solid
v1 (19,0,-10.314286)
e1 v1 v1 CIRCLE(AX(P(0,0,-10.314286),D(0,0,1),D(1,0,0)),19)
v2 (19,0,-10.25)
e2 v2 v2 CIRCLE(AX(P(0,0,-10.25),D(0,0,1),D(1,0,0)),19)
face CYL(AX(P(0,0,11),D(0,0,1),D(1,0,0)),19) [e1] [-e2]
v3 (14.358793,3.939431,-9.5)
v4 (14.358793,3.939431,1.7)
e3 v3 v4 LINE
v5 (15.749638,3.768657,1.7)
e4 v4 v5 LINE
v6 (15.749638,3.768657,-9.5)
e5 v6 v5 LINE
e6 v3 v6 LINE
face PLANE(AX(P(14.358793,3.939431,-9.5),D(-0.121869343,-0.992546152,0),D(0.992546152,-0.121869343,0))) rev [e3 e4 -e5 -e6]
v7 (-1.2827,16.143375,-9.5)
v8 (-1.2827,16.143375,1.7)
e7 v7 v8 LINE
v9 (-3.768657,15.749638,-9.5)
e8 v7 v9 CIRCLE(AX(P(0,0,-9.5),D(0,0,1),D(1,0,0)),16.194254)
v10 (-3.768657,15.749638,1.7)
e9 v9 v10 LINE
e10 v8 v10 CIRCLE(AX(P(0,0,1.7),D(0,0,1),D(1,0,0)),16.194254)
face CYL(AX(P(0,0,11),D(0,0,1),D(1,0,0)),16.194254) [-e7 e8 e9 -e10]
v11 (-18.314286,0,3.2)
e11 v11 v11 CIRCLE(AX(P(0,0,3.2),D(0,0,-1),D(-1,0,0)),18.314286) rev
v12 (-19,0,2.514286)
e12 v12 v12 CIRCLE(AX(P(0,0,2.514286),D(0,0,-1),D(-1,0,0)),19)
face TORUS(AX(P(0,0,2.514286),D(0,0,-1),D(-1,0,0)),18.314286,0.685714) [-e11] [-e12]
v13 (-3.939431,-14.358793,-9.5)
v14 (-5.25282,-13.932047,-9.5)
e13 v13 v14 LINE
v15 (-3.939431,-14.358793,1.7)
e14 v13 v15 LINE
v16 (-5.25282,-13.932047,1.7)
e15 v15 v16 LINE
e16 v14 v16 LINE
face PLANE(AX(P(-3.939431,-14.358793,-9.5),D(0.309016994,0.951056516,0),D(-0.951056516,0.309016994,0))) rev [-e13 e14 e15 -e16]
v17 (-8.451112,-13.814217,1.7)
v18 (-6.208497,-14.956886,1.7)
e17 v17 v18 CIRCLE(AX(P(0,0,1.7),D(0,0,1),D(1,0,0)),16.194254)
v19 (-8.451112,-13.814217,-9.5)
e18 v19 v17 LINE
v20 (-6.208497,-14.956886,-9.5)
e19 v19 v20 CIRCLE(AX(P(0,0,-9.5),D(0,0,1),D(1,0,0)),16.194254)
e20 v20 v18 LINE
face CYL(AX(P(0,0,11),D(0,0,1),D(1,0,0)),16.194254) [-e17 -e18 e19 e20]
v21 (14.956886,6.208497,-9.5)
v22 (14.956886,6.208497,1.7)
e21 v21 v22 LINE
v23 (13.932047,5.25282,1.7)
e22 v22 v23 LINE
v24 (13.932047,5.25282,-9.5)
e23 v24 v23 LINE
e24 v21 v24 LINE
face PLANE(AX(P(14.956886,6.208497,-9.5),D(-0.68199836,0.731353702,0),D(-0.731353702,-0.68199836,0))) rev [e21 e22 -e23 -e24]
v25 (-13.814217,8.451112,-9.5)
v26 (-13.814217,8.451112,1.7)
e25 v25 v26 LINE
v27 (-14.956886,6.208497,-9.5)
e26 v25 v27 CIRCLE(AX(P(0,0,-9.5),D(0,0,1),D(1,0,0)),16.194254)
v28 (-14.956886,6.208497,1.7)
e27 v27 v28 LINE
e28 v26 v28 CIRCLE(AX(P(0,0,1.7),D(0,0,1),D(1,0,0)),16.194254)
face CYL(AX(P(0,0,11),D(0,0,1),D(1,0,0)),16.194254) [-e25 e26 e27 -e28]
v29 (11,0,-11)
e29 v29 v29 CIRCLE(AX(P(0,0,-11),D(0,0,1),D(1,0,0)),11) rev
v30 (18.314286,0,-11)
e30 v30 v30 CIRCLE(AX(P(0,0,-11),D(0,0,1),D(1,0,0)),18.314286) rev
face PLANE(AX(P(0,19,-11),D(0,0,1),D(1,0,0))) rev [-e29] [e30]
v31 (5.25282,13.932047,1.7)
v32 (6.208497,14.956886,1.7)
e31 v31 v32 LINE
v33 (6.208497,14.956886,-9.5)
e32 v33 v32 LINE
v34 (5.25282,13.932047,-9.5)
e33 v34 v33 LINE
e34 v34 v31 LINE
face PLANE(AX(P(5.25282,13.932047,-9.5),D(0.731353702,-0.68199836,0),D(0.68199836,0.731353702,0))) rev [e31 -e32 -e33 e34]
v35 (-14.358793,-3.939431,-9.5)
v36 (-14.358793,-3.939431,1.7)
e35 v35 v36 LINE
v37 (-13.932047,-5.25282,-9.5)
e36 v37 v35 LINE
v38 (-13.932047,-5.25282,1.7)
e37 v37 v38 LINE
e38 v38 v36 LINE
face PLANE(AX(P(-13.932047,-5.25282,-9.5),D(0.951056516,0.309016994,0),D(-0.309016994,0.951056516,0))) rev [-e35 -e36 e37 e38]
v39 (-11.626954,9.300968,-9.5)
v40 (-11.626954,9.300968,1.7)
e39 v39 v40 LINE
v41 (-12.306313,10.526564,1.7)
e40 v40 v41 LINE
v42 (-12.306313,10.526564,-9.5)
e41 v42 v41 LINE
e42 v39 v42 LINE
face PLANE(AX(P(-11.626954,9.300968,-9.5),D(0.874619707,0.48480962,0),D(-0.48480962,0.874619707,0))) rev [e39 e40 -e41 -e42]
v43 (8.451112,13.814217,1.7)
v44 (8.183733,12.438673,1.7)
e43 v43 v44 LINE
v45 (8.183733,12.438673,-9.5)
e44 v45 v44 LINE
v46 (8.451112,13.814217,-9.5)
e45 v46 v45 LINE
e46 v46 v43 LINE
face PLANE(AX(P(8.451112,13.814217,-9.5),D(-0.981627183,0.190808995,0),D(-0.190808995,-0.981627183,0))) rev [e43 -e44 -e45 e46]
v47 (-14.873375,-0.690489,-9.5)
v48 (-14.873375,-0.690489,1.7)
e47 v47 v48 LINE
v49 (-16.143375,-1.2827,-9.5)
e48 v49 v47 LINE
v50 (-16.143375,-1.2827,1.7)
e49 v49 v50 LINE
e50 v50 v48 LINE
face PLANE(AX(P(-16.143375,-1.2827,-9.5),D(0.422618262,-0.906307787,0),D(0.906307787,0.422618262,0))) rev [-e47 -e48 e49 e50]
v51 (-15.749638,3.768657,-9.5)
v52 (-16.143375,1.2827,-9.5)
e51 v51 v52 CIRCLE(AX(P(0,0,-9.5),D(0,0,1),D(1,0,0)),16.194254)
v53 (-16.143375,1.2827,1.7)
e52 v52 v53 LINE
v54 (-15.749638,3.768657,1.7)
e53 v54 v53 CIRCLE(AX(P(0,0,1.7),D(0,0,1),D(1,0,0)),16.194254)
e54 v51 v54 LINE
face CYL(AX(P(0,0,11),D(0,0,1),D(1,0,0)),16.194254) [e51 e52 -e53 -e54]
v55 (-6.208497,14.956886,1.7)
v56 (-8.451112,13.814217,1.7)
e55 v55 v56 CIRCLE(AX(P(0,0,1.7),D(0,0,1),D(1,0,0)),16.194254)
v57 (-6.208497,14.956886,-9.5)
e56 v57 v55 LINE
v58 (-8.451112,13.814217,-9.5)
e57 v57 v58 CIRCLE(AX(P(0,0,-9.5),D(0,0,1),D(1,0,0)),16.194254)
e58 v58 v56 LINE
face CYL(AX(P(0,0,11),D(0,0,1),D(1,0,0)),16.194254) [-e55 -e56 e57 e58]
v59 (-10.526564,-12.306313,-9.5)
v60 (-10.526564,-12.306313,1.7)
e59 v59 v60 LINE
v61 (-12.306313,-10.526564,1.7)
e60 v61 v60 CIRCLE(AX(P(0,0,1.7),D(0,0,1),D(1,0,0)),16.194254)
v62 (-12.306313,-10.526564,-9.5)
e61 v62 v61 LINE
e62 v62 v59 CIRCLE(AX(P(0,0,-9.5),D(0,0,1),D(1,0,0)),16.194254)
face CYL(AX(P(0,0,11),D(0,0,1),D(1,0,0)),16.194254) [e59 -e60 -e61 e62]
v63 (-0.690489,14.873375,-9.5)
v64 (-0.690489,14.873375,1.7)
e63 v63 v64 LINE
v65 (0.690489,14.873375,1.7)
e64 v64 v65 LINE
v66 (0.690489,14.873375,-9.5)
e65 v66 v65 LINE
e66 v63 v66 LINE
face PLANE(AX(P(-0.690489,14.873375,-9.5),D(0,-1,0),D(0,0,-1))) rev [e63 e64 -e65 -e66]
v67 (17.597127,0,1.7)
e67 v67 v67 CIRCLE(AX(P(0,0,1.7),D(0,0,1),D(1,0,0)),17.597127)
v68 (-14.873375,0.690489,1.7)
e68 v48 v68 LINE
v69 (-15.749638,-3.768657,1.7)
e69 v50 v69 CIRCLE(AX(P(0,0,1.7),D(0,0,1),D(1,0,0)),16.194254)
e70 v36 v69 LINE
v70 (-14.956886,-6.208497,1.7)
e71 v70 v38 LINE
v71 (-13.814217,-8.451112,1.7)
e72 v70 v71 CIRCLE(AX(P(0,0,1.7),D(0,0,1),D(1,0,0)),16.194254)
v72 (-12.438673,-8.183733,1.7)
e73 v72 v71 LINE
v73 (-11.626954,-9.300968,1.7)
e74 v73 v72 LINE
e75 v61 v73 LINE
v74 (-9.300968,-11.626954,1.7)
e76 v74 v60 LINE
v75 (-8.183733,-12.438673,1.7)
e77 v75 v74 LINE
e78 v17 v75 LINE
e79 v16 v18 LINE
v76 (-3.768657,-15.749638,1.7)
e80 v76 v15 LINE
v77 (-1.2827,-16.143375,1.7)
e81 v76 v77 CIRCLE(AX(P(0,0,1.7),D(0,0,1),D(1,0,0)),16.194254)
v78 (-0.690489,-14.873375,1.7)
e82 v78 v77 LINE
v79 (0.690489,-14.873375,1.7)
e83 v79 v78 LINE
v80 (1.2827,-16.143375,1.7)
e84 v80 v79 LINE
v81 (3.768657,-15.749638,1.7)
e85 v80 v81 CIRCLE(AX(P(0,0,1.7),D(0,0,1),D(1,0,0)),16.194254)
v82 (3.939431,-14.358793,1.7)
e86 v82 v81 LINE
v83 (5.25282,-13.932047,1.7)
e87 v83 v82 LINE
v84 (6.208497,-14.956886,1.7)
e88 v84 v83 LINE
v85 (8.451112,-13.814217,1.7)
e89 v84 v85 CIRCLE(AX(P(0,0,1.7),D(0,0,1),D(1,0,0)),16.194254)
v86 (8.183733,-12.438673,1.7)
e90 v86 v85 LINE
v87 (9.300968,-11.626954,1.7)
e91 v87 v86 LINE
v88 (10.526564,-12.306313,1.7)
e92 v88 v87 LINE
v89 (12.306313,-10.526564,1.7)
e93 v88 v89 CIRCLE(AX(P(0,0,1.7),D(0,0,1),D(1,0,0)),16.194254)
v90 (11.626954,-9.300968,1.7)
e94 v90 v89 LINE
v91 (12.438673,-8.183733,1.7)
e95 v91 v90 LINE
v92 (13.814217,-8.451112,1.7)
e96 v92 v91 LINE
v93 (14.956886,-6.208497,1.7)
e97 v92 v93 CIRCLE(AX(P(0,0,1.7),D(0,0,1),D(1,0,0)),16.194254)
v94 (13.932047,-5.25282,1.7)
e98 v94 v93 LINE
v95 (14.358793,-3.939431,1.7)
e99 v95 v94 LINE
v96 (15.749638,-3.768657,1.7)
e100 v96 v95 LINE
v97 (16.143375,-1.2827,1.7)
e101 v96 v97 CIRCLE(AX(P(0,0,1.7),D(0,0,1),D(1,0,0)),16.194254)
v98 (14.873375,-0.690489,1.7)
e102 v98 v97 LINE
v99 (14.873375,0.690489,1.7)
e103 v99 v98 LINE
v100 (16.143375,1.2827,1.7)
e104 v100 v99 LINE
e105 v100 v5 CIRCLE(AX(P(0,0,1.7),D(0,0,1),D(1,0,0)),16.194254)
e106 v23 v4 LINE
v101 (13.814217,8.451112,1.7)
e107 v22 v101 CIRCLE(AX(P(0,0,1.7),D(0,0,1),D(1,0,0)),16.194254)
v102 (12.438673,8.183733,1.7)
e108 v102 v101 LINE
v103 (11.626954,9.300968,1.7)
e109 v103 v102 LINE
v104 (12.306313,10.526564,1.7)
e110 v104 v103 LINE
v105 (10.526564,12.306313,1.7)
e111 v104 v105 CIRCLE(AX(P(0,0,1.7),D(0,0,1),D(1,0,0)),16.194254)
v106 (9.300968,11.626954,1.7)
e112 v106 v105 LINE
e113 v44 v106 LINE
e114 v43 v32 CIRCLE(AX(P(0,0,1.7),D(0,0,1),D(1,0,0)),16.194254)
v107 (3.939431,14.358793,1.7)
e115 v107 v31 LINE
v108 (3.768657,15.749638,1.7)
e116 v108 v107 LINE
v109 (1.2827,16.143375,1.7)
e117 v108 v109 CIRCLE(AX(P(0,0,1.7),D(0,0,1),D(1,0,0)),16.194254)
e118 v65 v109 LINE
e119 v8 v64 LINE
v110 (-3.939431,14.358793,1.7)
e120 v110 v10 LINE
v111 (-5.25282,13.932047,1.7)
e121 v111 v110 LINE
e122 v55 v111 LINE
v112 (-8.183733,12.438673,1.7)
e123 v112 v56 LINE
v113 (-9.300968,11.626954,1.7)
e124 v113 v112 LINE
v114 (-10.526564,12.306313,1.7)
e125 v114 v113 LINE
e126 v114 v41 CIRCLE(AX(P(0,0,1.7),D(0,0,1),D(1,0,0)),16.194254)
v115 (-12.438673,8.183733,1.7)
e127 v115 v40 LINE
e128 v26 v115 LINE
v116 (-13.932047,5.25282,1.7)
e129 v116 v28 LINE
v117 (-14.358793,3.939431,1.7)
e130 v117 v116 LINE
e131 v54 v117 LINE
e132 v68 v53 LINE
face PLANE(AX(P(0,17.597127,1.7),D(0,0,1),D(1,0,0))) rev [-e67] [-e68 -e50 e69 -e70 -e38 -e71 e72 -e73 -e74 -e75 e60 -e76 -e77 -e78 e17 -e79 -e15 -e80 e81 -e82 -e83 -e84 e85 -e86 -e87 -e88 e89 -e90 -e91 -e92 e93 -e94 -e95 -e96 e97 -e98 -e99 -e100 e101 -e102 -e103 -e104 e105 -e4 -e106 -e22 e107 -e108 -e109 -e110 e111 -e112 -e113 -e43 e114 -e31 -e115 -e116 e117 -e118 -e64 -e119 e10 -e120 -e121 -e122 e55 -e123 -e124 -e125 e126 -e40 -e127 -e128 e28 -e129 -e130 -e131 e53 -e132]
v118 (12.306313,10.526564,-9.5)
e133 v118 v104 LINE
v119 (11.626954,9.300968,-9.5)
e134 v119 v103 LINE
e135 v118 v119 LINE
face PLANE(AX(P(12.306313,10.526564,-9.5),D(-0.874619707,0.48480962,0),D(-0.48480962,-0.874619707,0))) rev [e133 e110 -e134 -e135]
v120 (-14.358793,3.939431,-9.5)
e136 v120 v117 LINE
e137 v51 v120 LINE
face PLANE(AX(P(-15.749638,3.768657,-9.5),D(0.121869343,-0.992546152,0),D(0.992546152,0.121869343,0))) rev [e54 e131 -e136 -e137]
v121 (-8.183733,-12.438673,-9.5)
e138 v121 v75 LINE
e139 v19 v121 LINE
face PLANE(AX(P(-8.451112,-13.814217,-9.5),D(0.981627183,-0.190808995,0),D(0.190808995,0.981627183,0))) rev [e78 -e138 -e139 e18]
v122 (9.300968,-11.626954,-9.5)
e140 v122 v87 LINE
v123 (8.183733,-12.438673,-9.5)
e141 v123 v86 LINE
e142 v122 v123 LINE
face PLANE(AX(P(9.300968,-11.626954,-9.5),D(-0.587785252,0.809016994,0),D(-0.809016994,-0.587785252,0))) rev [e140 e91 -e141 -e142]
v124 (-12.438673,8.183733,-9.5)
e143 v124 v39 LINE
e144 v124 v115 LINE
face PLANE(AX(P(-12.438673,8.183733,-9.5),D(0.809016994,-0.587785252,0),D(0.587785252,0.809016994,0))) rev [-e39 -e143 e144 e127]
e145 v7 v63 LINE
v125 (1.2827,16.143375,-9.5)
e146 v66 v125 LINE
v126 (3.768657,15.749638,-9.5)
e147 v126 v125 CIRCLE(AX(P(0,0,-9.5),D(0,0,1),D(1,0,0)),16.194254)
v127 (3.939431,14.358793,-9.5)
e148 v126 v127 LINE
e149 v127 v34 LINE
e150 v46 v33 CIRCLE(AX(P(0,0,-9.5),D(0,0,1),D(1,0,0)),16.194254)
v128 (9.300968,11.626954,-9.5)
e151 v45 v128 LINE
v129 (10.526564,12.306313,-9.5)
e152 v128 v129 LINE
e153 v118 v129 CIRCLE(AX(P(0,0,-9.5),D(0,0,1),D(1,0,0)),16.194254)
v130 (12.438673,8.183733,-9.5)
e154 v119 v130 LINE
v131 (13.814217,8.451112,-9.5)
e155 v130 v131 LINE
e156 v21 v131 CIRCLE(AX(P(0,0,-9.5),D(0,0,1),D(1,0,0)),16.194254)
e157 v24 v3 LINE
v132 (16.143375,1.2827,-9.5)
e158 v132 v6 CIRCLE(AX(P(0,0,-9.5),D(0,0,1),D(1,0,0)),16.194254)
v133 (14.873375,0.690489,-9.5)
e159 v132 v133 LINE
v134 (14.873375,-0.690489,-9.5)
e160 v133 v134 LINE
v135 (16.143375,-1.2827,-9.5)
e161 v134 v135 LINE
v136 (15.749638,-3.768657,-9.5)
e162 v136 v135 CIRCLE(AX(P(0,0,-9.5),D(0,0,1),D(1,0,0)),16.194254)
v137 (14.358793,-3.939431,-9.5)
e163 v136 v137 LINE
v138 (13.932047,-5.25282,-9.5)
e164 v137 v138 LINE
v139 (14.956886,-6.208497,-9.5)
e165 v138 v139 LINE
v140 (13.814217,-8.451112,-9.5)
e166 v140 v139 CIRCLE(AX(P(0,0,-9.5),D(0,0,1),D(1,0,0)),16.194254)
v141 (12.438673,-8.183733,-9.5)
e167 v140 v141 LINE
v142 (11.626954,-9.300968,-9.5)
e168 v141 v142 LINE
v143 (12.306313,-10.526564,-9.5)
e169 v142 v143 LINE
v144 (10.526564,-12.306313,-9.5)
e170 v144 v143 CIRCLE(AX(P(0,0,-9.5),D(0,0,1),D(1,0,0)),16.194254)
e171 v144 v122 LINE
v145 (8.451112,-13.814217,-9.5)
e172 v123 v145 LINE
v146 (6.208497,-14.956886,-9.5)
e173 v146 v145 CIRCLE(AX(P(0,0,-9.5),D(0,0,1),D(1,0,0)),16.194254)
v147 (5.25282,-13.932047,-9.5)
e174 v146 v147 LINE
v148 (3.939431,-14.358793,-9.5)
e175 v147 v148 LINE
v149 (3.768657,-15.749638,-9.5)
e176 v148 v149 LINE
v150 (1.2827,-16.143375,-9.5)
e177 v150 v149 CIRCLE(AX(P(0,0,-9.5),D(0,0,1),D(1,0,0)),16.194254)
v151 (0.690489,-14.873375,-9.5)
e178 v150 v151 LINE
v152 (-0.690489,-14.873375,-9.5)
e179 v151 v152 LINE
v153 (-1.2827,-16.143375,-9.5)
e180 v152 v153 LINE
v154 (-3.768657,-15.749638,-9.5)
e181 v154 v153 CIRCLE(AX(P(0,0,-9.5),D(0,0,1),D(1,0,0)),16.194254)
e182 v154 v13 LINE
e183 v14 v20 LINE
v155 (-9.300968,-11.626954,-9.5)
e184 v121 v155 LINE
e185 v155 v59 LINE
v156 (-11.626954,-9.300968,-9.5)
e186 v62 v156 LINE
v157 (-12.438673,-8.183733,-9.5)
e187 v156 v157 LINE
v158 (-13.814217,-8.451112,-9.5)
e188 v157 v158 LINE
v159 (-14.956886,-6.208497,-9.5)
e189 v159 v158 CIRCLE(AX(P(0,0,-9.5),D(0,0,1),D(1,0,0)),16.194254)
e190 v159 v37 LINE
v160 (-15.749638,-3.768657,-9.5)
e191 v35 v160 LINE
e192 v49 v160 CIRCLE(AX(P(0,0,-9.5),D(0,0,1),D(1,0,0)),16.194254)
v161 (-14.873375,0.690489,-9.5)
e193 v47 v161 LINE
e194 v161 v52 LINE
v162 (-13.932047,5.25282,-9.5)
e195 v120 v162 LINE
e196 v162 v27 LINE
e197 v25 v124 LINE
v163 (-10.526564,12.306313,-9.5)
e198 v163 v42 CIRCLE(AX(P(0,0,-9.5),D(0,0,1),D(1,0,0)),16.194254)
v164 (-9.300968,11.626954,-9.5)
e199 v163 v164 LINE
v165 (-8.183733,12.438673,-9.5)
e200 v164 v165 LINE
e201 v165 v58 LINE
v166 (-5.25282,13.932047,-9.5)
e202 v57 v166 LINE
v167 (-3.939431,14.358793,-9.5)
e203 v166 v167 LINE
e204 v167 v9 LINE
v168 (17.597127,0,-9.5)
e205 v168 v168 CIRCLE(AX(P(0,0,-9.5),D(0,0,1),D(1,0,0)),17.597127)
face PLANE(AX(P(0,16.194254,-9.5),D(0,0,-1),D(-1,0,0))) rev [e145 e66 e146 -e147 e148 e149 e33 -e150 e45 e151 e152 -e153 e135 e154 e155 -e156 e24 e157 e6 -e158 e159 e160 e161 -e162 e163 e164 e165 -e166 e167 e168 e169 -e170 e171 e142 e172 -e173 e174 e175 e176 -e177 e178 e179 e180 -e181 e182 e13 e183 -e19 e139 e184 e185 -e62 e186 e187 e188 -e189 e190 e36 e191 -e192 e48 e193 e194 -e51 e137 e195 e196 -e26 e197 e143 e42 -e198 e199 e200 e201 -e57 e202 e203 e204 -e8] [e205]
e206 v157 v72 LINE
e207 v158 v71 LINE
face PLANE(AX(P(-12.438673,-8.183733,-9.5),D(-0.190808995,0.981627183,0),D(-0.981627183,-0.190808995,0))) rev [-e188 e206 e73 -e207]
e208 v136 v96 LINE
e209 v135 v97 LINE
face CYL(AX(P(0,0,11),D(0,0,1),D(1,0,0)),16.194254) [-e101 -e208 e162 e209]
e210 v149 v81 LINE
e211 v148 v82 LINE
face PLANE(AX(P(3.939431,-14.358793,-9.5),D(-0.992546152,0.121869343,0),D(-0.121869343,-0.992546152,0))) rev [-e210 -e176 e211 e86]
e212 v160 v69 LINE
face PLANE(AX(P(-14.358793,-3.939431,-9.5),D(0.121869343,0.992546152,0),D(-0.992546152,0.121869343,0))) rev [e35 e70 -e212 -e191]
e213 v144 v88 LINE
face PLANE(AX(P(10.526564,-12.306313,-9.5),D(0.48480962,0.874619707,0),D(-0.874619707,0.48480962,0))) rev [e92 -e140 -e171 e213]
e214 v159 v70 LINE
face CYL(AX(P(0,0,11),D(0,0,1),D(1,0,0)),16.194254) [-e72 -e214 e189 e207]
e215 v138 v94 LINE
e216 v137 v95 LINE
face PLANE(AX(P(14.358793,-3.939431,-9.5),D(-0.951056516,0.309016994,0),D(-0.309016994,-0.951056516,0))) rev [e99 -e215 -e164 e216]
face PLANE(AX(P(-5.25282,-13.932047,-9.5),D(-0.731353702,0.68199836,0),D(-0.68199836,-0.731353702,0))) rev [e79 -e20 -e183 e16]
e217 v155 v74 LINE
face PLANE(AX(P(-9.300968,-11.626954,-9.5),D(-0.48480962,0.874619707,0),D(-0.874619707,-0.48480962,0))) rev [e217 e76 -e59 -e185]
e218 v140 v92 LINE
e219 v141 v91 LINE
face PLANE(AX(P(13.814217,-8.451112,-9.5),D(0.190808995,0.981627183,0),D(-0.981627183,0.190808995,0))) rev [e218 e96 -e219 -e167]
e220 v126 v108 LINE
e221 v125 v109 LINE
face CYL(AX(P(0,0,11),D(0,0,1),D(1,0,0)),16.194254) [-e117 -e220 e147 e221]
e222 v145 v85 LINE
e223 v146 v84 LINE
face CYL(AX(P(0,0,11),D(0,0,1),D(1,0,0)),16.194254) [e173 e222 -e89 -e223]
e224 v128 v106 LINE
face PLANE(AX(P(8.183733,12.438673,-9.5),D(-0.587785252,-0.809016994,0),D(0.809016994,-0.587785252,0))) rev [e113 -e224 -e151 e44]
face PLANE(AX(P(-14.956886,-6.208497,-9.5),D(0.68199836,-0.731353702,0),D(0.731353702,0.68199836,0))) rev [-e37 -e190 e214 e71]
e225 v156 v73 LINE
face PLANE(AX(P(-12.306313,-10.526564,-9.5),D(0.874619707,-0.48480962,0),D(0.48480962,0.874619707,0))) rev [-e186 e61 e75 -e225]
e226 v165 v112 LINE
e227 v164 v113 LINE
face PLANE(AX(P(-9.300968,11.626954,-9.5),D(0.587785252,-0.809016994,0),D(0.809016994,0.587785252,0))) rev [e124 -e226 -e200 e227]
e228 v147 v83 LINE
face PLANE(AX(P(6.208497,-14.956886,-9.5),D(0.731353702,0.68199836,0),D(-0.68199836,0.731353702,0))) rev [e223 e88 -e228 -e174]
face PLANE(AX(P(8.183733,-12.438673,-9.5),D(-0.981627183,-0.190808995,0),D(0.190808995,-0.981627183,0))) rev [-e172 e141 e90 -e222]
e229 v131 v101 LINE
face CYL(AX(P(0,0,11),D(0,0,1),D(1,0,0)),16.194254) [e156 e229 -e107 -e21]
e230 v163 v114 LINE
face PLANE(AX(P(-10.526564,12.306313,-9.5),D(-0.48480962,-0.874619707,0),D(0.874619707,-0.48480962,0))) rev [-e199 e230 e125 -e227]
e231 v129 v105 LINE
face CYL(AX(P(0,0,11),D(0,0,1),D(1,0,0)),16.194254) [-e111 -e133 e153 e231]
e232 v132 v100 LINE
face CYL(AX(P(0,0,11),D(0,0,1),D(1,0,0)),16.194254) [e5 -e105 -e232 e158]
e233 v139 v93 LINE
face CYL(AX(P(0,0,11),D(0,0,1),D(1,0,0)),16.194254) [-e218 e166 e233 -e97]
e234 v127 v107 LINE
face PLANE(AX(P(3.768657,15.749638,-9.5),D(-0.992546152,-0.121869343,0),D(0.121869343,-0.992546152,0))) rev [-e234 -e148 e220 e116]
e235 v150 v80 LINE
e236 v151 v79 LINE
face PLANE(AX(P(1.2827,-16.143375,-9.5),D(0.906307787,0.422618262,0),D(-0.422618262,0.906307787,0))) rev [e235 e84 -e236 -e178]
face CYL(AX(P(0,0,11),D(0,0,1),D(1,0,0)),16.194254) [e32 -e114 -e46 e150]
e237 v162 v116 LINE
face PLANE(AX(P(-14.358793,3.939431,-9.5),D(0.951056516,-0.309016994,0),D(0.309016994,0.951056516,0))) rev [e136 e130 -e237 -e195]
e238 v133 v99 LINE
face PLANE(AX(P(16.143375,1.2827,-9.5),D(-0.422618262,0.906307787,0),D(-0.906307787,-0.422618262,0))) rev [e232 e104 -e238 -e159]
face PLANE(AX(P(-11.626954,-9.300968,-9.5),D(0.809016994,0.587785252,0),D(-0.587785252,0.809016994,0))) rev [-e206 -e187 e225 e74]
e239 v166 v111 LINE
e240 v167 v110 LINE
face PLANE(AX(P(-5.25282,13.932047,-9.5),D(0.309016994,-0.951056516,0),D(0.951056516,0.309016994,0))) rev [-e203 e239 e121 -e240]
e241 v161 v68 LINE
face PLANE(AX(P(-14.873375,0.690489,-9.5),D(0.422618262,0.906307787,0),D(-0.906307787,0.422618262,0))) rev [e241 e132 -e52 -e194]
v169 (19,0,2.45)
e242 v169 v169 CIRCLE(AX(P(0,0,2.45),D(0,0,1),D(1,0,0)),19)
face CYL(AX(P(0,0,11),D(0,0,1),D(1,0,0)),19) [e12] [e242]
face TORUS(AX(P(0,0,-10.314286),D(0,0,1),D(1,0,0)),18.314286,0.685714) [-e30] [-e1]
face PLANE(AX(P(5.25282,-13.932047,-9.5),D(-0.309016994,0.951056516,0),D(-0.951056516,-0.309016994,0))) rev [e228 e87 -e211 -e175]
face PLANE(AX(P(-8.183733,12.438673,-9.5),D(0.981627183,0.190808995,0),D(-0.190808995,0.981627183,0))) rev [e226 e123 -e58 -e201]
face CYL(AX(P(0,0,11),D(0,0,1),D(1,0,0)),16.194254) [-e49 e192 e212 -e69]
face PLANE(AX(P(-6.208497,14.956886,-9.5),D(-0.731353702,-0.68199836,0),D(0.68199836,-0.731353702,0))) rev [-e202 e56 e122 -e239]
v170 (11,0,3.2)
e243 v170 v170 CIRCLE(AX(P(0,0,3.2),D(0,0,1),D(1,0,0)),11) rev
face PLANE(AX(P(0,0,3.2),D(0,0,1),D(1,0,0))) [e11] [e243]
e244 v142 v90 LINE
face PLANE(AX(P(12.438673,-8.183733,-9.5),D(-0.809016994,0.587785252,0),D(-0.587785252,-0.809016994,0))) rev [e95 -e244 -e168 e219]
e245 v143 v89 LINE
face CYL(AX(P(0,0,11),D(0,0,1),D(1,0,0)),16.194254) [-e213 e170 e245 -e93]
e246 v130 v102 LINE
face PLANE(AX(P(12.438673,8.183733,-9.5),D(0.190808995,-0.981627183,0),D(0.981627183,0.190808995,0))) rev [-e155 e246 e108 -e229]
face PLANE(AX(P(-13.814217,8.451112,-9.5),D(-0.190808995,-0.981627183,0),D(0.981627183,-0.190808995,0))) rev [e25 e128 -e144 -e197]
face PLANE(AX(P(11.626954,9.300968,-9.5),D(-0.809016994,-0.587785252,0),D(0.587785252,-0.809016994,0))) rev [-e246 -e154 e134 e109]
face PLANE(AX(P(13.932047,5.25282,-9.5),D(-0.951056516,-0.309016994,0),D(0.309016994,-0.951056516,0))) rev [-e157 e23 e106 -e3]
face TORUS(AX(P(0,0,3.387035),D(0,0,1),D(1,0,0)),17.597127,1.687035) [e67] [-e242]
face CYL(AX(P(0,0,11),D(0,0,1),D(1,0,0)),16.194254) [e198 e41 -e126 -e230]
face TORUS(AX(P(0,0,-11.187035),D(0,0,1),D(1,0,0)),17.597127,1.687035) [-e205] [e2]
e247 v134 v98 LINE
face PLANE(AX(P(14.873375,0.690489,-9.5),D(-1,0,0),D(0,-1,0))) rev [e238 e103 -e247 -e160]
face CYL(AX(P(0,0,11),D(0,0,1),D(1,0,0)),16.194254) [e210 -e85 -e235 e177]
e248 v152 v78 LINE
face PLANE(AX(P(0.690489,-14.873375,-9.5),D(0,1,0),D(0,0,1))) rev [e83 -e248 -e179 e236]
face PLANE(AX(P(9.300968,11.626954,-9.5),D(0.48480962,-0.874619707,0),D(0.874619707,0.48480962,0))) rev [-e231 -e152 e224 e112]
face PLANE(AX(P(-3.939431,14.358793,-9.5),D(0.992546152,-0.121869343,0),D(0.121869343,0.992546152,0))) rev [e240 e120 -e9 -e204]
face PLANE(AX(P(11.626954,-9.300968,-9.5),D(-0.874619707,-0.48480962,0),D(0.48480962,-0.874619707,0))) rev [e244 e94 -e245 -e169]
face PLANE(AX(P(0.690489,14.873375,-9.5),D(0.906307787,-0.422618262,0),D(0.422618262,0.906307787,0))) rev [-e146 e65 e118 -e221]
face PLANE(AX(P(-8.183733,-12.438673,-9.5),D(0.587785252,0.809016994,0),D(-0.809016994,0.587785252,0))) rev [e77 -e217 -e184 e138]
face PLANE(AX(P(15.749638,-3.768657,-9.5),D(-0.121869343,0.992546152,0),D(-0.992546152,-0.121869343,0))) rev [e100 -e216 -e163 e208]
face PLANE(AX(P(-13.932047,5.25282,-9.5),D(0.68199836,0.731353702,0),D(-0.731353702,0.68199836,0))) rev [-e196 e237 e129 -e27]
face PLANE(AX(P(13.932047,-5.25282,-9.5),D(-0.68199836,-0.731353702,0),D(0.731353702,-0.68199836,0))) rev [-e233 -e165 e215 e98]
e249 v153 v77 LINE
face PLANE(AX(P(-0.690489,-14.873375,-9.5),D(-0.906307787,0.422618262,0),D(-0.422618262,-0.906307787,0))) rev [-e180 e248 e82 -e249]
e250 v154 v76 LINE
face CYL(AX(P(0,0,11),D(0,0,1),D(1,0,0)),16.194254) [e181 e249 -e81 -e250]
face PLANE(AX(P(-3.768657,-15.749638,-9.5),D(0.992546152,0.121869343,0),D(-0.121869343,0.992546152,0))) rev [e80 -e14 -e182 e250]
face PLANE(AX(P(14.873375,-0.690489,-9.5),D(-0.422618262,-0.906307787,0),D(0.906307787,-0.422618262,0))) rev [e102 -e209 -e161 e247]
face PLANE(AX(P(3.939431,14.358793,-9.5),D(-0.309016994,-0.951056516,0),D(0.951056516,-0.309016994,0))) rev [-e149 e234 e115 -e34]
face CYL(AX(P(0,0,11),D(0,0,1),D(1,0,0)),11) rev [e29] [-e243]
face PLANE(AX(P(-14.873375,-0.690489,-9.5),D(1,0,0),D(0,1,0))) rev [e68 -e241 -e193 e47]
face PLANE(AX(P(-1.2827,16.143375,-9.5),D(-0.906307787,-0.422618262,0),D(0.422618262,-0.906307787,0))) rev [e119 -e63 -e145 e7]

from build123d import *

# Parameters (mm, degrees)
CUT_EXTRUDE1_START     = -9.5
CUT_EXTRUDE1_DEPTH     = 11.2
CIRPATTERN1_COUNT      = 20
SKETCH4_R              = 2
CUT_EXTRUDE2_DEPTH     = 30.034462282
CUT_EXTRUDE3_DEPTH     = 1.5
CIRPATTERN2_COUNT      = 2
CIRPATTERN2_ANGLE      = 90
FILLET1_R              = 0.685714286
FILLET2_R              = 0.24
MOVE_START             = -11
MOVE_FACE1_OUTLINE_R   = 11
MOVE_FACE1_OUTLINE_R_2 = 4
MOVE_FACE1_DEPTH       = 14.2


# Read off the part's stored shape, not the designer's step: Move Face1
with BuildPart() as part:
    # Sketch7 → Revolve1 (revolve)
    with BuildSketch(Plane(origin=(0, 0, 0), x_dir=(0, 0, -1), z_dir=(1, 0, 0)), mode=Mode.PRIVATE) as revolve1_sk:
        with BuildLine():
            Line((-11, 4), (-11, 12))
            Line((-11, 12), (-3.2, 12))
            Line((-3.2, 12), (-3.2, 19))
            Line((-3.2, 19), (-2.45, 19))
            ThreePointArc((-2.45, 19), (-1.899268567, 18.392512657), (-1.7, 17.597127202))
            Line((-1.7, 17.597127202), (-1.7, 16.194254403))
            Line((-1.7, 16.194254403), (9.5, 16.194254403))
            Line((9.5, 16.194254403), (9.5, 17.597127202))
            ThreePointArc((9.5, 17.597127202), (9.699268567, 18.392512657), (10.25, 19))
            Line((10.25, 19), (11, 19))
            Line((11, 19), (11, 4))
            Line((11, 4), (-11, 4))
        make_face()
    revolve(revolve1_sk.sketch.rotate(Axis((0, 0, 11), (0, 0, -1)), 90), axis=Axis((0, 0, 11), (0, 0, -1)))

    # Sketch3 → Cut-Extrude1 (cut)
    with BuildSketch(Plane.XY.offset(CUT_EXTRUDE1_START)):
        with BuildLine():
            Line((-0.690489274, 14.873375), (0.690489274, 14.873375))
            Line((0.690489274, 14.873375), (1.2827, 16.143375))
            ThreePointArc((1.2827, 16.143375), (0, 16.194254403), (-1.2827, 16.143375))
            Line((-1.2827, 16.143375), (-0.690489274, 14.873375))
        make_face()
    cut_extrude1 = extrude(amount=CUT_EXTRUDE1_DEPTH, mode=Mode.SUBTRACT)

    # CirPattern1: Cut-Extrude1 ×20 about axis
    cirpattern1_axis = Axis((0, 0, 0), (0, 0, 1))
    for i in range(1, CIRPATTERN1_COUNT):
        add(cut_extrude1.rotate(cirpattern1_axis, i * 360 / CIRPATTERN1_COUNT), mode=Mode.SUBTRACT)

    # Sketch4 → Cut-Extrude2 (cut, through all)
    with BuildSketch(Plane(origin=(0, 0, 0), x_dir=(1, 0, 0), z_dir=(0, 1, 0))):
        with Locations(Location((0, -7.1, 0), (0, 0, 90))):
            Circle(SKETCH4_R)
    cut_extrude2 = extrude(amount=CUT_EXTRUDE2_DEPTH, mode=Mode.SUBTRACT)

    # Sketch5 → Revolve2 (revolve)
    with BuildSketch(Plane.XY.offset(7.1), mode=Mode.PRIVATE) as revolve2_sk:
        Polygon((0, 11.832159566), (0, 4), (-1.365, 4), (-2, 4.635), (-2, 11.197159566), (-1.365, 11.832159566), align=None)
    revolve2 = revolve(revolve2_sk.sketch.rotate(Axis((0, 0, 7.1), (0, 1, 0)), 270), axis=Axis((0, 0, 7.1), (0, 1, 0)))

    # Sketch6 → Cut-Extrude3 (cut)
    with BuildSketch(Plane(origin=(0, 11.832159566, 0), x_dir=(-1, 0, 0), z_dir=(0, -1, 0))):
        Polygon((0, -5.945299462), (-1, -6.522649731), (-1, -7.677350269), (0, -8.254700538), (1, -7.677350269), (1, -6.522649731), align=None)
    cut_extrude3 = extrude(amount=CUT_EXTRUDE3_DEPTH, mode=Mode.SUBTRACT)

    # CirPattern2: Cut-Extrude2, Revolve2, Cut-Extrude3 ×2 about axis
    cirpattern2_axis = Axis((0, 0, 0), (0, 0, -1))
    add([cut_extrude2.rotate(cirpattern2_axis, i * CIRPATTERN2_ANGLE / (CIRPATTERN2_COUNT - 1)) for i in range(1, CIRPATTERN2_COUNT)], mode=Mode.SUBTRACT)
    add([revolve2.rotate(cirpattern2_axis, i * CIRPATTERN2_ANGLE / (CIRPATTERN2_COUNT - 1)) for i in range(1, CIRPATTERN2_COUNT)])
    add([cut_extrude3.rotate(cirpattern2_axis, i * CIRPATTERN2_ANGLE / (CIRPATTERN2_COUNT - 1)) for i in range(1, CIRPATTERN2_COUNT)], mode=Mode.SUBTRACT)

    # Fillet1
    fillet1_edges = [part.edges().sort_by_distance(p)[0] for p in [
        (-19, 0, -11),
        (-12, 0, 11),
        (-12, 0, 3.2),
        (-19, 0, 3.2),
    ]]
    fillet(fillet1_edges, radius=FILLET1_R)

    # Fillet2
    fillet2_edges = [part.edges().sort_by_distance(p)[0] for p in [
        (-4, 0, -11),
        (-1e-09, 12, 9.100000011),
        (11.832159566, -2, 7.1),
        (-4, 0, 11),
    ]]
    fillet(fillet2_edges, radius=FILLET2_R)

    # Split1
    split(bisect_by=Plane.XY.offset(3.2), keep=Keep.BOTTOM)

    # Move Face1 outline → Move Face1 (cut)
    with BuildSketch(Plane.XY.offset(MOVE_START)):
        Circle(MOVE_FACE1_OUTLINE_R)
        Circle(MOVE_FACE1_OUTLINE_R_2, mode=Mode.SUBTRACT)
    extrude(amount=MOVE_FACE1_DEPTH, mode=Mode.SUBTRACT)


solid = part.part
